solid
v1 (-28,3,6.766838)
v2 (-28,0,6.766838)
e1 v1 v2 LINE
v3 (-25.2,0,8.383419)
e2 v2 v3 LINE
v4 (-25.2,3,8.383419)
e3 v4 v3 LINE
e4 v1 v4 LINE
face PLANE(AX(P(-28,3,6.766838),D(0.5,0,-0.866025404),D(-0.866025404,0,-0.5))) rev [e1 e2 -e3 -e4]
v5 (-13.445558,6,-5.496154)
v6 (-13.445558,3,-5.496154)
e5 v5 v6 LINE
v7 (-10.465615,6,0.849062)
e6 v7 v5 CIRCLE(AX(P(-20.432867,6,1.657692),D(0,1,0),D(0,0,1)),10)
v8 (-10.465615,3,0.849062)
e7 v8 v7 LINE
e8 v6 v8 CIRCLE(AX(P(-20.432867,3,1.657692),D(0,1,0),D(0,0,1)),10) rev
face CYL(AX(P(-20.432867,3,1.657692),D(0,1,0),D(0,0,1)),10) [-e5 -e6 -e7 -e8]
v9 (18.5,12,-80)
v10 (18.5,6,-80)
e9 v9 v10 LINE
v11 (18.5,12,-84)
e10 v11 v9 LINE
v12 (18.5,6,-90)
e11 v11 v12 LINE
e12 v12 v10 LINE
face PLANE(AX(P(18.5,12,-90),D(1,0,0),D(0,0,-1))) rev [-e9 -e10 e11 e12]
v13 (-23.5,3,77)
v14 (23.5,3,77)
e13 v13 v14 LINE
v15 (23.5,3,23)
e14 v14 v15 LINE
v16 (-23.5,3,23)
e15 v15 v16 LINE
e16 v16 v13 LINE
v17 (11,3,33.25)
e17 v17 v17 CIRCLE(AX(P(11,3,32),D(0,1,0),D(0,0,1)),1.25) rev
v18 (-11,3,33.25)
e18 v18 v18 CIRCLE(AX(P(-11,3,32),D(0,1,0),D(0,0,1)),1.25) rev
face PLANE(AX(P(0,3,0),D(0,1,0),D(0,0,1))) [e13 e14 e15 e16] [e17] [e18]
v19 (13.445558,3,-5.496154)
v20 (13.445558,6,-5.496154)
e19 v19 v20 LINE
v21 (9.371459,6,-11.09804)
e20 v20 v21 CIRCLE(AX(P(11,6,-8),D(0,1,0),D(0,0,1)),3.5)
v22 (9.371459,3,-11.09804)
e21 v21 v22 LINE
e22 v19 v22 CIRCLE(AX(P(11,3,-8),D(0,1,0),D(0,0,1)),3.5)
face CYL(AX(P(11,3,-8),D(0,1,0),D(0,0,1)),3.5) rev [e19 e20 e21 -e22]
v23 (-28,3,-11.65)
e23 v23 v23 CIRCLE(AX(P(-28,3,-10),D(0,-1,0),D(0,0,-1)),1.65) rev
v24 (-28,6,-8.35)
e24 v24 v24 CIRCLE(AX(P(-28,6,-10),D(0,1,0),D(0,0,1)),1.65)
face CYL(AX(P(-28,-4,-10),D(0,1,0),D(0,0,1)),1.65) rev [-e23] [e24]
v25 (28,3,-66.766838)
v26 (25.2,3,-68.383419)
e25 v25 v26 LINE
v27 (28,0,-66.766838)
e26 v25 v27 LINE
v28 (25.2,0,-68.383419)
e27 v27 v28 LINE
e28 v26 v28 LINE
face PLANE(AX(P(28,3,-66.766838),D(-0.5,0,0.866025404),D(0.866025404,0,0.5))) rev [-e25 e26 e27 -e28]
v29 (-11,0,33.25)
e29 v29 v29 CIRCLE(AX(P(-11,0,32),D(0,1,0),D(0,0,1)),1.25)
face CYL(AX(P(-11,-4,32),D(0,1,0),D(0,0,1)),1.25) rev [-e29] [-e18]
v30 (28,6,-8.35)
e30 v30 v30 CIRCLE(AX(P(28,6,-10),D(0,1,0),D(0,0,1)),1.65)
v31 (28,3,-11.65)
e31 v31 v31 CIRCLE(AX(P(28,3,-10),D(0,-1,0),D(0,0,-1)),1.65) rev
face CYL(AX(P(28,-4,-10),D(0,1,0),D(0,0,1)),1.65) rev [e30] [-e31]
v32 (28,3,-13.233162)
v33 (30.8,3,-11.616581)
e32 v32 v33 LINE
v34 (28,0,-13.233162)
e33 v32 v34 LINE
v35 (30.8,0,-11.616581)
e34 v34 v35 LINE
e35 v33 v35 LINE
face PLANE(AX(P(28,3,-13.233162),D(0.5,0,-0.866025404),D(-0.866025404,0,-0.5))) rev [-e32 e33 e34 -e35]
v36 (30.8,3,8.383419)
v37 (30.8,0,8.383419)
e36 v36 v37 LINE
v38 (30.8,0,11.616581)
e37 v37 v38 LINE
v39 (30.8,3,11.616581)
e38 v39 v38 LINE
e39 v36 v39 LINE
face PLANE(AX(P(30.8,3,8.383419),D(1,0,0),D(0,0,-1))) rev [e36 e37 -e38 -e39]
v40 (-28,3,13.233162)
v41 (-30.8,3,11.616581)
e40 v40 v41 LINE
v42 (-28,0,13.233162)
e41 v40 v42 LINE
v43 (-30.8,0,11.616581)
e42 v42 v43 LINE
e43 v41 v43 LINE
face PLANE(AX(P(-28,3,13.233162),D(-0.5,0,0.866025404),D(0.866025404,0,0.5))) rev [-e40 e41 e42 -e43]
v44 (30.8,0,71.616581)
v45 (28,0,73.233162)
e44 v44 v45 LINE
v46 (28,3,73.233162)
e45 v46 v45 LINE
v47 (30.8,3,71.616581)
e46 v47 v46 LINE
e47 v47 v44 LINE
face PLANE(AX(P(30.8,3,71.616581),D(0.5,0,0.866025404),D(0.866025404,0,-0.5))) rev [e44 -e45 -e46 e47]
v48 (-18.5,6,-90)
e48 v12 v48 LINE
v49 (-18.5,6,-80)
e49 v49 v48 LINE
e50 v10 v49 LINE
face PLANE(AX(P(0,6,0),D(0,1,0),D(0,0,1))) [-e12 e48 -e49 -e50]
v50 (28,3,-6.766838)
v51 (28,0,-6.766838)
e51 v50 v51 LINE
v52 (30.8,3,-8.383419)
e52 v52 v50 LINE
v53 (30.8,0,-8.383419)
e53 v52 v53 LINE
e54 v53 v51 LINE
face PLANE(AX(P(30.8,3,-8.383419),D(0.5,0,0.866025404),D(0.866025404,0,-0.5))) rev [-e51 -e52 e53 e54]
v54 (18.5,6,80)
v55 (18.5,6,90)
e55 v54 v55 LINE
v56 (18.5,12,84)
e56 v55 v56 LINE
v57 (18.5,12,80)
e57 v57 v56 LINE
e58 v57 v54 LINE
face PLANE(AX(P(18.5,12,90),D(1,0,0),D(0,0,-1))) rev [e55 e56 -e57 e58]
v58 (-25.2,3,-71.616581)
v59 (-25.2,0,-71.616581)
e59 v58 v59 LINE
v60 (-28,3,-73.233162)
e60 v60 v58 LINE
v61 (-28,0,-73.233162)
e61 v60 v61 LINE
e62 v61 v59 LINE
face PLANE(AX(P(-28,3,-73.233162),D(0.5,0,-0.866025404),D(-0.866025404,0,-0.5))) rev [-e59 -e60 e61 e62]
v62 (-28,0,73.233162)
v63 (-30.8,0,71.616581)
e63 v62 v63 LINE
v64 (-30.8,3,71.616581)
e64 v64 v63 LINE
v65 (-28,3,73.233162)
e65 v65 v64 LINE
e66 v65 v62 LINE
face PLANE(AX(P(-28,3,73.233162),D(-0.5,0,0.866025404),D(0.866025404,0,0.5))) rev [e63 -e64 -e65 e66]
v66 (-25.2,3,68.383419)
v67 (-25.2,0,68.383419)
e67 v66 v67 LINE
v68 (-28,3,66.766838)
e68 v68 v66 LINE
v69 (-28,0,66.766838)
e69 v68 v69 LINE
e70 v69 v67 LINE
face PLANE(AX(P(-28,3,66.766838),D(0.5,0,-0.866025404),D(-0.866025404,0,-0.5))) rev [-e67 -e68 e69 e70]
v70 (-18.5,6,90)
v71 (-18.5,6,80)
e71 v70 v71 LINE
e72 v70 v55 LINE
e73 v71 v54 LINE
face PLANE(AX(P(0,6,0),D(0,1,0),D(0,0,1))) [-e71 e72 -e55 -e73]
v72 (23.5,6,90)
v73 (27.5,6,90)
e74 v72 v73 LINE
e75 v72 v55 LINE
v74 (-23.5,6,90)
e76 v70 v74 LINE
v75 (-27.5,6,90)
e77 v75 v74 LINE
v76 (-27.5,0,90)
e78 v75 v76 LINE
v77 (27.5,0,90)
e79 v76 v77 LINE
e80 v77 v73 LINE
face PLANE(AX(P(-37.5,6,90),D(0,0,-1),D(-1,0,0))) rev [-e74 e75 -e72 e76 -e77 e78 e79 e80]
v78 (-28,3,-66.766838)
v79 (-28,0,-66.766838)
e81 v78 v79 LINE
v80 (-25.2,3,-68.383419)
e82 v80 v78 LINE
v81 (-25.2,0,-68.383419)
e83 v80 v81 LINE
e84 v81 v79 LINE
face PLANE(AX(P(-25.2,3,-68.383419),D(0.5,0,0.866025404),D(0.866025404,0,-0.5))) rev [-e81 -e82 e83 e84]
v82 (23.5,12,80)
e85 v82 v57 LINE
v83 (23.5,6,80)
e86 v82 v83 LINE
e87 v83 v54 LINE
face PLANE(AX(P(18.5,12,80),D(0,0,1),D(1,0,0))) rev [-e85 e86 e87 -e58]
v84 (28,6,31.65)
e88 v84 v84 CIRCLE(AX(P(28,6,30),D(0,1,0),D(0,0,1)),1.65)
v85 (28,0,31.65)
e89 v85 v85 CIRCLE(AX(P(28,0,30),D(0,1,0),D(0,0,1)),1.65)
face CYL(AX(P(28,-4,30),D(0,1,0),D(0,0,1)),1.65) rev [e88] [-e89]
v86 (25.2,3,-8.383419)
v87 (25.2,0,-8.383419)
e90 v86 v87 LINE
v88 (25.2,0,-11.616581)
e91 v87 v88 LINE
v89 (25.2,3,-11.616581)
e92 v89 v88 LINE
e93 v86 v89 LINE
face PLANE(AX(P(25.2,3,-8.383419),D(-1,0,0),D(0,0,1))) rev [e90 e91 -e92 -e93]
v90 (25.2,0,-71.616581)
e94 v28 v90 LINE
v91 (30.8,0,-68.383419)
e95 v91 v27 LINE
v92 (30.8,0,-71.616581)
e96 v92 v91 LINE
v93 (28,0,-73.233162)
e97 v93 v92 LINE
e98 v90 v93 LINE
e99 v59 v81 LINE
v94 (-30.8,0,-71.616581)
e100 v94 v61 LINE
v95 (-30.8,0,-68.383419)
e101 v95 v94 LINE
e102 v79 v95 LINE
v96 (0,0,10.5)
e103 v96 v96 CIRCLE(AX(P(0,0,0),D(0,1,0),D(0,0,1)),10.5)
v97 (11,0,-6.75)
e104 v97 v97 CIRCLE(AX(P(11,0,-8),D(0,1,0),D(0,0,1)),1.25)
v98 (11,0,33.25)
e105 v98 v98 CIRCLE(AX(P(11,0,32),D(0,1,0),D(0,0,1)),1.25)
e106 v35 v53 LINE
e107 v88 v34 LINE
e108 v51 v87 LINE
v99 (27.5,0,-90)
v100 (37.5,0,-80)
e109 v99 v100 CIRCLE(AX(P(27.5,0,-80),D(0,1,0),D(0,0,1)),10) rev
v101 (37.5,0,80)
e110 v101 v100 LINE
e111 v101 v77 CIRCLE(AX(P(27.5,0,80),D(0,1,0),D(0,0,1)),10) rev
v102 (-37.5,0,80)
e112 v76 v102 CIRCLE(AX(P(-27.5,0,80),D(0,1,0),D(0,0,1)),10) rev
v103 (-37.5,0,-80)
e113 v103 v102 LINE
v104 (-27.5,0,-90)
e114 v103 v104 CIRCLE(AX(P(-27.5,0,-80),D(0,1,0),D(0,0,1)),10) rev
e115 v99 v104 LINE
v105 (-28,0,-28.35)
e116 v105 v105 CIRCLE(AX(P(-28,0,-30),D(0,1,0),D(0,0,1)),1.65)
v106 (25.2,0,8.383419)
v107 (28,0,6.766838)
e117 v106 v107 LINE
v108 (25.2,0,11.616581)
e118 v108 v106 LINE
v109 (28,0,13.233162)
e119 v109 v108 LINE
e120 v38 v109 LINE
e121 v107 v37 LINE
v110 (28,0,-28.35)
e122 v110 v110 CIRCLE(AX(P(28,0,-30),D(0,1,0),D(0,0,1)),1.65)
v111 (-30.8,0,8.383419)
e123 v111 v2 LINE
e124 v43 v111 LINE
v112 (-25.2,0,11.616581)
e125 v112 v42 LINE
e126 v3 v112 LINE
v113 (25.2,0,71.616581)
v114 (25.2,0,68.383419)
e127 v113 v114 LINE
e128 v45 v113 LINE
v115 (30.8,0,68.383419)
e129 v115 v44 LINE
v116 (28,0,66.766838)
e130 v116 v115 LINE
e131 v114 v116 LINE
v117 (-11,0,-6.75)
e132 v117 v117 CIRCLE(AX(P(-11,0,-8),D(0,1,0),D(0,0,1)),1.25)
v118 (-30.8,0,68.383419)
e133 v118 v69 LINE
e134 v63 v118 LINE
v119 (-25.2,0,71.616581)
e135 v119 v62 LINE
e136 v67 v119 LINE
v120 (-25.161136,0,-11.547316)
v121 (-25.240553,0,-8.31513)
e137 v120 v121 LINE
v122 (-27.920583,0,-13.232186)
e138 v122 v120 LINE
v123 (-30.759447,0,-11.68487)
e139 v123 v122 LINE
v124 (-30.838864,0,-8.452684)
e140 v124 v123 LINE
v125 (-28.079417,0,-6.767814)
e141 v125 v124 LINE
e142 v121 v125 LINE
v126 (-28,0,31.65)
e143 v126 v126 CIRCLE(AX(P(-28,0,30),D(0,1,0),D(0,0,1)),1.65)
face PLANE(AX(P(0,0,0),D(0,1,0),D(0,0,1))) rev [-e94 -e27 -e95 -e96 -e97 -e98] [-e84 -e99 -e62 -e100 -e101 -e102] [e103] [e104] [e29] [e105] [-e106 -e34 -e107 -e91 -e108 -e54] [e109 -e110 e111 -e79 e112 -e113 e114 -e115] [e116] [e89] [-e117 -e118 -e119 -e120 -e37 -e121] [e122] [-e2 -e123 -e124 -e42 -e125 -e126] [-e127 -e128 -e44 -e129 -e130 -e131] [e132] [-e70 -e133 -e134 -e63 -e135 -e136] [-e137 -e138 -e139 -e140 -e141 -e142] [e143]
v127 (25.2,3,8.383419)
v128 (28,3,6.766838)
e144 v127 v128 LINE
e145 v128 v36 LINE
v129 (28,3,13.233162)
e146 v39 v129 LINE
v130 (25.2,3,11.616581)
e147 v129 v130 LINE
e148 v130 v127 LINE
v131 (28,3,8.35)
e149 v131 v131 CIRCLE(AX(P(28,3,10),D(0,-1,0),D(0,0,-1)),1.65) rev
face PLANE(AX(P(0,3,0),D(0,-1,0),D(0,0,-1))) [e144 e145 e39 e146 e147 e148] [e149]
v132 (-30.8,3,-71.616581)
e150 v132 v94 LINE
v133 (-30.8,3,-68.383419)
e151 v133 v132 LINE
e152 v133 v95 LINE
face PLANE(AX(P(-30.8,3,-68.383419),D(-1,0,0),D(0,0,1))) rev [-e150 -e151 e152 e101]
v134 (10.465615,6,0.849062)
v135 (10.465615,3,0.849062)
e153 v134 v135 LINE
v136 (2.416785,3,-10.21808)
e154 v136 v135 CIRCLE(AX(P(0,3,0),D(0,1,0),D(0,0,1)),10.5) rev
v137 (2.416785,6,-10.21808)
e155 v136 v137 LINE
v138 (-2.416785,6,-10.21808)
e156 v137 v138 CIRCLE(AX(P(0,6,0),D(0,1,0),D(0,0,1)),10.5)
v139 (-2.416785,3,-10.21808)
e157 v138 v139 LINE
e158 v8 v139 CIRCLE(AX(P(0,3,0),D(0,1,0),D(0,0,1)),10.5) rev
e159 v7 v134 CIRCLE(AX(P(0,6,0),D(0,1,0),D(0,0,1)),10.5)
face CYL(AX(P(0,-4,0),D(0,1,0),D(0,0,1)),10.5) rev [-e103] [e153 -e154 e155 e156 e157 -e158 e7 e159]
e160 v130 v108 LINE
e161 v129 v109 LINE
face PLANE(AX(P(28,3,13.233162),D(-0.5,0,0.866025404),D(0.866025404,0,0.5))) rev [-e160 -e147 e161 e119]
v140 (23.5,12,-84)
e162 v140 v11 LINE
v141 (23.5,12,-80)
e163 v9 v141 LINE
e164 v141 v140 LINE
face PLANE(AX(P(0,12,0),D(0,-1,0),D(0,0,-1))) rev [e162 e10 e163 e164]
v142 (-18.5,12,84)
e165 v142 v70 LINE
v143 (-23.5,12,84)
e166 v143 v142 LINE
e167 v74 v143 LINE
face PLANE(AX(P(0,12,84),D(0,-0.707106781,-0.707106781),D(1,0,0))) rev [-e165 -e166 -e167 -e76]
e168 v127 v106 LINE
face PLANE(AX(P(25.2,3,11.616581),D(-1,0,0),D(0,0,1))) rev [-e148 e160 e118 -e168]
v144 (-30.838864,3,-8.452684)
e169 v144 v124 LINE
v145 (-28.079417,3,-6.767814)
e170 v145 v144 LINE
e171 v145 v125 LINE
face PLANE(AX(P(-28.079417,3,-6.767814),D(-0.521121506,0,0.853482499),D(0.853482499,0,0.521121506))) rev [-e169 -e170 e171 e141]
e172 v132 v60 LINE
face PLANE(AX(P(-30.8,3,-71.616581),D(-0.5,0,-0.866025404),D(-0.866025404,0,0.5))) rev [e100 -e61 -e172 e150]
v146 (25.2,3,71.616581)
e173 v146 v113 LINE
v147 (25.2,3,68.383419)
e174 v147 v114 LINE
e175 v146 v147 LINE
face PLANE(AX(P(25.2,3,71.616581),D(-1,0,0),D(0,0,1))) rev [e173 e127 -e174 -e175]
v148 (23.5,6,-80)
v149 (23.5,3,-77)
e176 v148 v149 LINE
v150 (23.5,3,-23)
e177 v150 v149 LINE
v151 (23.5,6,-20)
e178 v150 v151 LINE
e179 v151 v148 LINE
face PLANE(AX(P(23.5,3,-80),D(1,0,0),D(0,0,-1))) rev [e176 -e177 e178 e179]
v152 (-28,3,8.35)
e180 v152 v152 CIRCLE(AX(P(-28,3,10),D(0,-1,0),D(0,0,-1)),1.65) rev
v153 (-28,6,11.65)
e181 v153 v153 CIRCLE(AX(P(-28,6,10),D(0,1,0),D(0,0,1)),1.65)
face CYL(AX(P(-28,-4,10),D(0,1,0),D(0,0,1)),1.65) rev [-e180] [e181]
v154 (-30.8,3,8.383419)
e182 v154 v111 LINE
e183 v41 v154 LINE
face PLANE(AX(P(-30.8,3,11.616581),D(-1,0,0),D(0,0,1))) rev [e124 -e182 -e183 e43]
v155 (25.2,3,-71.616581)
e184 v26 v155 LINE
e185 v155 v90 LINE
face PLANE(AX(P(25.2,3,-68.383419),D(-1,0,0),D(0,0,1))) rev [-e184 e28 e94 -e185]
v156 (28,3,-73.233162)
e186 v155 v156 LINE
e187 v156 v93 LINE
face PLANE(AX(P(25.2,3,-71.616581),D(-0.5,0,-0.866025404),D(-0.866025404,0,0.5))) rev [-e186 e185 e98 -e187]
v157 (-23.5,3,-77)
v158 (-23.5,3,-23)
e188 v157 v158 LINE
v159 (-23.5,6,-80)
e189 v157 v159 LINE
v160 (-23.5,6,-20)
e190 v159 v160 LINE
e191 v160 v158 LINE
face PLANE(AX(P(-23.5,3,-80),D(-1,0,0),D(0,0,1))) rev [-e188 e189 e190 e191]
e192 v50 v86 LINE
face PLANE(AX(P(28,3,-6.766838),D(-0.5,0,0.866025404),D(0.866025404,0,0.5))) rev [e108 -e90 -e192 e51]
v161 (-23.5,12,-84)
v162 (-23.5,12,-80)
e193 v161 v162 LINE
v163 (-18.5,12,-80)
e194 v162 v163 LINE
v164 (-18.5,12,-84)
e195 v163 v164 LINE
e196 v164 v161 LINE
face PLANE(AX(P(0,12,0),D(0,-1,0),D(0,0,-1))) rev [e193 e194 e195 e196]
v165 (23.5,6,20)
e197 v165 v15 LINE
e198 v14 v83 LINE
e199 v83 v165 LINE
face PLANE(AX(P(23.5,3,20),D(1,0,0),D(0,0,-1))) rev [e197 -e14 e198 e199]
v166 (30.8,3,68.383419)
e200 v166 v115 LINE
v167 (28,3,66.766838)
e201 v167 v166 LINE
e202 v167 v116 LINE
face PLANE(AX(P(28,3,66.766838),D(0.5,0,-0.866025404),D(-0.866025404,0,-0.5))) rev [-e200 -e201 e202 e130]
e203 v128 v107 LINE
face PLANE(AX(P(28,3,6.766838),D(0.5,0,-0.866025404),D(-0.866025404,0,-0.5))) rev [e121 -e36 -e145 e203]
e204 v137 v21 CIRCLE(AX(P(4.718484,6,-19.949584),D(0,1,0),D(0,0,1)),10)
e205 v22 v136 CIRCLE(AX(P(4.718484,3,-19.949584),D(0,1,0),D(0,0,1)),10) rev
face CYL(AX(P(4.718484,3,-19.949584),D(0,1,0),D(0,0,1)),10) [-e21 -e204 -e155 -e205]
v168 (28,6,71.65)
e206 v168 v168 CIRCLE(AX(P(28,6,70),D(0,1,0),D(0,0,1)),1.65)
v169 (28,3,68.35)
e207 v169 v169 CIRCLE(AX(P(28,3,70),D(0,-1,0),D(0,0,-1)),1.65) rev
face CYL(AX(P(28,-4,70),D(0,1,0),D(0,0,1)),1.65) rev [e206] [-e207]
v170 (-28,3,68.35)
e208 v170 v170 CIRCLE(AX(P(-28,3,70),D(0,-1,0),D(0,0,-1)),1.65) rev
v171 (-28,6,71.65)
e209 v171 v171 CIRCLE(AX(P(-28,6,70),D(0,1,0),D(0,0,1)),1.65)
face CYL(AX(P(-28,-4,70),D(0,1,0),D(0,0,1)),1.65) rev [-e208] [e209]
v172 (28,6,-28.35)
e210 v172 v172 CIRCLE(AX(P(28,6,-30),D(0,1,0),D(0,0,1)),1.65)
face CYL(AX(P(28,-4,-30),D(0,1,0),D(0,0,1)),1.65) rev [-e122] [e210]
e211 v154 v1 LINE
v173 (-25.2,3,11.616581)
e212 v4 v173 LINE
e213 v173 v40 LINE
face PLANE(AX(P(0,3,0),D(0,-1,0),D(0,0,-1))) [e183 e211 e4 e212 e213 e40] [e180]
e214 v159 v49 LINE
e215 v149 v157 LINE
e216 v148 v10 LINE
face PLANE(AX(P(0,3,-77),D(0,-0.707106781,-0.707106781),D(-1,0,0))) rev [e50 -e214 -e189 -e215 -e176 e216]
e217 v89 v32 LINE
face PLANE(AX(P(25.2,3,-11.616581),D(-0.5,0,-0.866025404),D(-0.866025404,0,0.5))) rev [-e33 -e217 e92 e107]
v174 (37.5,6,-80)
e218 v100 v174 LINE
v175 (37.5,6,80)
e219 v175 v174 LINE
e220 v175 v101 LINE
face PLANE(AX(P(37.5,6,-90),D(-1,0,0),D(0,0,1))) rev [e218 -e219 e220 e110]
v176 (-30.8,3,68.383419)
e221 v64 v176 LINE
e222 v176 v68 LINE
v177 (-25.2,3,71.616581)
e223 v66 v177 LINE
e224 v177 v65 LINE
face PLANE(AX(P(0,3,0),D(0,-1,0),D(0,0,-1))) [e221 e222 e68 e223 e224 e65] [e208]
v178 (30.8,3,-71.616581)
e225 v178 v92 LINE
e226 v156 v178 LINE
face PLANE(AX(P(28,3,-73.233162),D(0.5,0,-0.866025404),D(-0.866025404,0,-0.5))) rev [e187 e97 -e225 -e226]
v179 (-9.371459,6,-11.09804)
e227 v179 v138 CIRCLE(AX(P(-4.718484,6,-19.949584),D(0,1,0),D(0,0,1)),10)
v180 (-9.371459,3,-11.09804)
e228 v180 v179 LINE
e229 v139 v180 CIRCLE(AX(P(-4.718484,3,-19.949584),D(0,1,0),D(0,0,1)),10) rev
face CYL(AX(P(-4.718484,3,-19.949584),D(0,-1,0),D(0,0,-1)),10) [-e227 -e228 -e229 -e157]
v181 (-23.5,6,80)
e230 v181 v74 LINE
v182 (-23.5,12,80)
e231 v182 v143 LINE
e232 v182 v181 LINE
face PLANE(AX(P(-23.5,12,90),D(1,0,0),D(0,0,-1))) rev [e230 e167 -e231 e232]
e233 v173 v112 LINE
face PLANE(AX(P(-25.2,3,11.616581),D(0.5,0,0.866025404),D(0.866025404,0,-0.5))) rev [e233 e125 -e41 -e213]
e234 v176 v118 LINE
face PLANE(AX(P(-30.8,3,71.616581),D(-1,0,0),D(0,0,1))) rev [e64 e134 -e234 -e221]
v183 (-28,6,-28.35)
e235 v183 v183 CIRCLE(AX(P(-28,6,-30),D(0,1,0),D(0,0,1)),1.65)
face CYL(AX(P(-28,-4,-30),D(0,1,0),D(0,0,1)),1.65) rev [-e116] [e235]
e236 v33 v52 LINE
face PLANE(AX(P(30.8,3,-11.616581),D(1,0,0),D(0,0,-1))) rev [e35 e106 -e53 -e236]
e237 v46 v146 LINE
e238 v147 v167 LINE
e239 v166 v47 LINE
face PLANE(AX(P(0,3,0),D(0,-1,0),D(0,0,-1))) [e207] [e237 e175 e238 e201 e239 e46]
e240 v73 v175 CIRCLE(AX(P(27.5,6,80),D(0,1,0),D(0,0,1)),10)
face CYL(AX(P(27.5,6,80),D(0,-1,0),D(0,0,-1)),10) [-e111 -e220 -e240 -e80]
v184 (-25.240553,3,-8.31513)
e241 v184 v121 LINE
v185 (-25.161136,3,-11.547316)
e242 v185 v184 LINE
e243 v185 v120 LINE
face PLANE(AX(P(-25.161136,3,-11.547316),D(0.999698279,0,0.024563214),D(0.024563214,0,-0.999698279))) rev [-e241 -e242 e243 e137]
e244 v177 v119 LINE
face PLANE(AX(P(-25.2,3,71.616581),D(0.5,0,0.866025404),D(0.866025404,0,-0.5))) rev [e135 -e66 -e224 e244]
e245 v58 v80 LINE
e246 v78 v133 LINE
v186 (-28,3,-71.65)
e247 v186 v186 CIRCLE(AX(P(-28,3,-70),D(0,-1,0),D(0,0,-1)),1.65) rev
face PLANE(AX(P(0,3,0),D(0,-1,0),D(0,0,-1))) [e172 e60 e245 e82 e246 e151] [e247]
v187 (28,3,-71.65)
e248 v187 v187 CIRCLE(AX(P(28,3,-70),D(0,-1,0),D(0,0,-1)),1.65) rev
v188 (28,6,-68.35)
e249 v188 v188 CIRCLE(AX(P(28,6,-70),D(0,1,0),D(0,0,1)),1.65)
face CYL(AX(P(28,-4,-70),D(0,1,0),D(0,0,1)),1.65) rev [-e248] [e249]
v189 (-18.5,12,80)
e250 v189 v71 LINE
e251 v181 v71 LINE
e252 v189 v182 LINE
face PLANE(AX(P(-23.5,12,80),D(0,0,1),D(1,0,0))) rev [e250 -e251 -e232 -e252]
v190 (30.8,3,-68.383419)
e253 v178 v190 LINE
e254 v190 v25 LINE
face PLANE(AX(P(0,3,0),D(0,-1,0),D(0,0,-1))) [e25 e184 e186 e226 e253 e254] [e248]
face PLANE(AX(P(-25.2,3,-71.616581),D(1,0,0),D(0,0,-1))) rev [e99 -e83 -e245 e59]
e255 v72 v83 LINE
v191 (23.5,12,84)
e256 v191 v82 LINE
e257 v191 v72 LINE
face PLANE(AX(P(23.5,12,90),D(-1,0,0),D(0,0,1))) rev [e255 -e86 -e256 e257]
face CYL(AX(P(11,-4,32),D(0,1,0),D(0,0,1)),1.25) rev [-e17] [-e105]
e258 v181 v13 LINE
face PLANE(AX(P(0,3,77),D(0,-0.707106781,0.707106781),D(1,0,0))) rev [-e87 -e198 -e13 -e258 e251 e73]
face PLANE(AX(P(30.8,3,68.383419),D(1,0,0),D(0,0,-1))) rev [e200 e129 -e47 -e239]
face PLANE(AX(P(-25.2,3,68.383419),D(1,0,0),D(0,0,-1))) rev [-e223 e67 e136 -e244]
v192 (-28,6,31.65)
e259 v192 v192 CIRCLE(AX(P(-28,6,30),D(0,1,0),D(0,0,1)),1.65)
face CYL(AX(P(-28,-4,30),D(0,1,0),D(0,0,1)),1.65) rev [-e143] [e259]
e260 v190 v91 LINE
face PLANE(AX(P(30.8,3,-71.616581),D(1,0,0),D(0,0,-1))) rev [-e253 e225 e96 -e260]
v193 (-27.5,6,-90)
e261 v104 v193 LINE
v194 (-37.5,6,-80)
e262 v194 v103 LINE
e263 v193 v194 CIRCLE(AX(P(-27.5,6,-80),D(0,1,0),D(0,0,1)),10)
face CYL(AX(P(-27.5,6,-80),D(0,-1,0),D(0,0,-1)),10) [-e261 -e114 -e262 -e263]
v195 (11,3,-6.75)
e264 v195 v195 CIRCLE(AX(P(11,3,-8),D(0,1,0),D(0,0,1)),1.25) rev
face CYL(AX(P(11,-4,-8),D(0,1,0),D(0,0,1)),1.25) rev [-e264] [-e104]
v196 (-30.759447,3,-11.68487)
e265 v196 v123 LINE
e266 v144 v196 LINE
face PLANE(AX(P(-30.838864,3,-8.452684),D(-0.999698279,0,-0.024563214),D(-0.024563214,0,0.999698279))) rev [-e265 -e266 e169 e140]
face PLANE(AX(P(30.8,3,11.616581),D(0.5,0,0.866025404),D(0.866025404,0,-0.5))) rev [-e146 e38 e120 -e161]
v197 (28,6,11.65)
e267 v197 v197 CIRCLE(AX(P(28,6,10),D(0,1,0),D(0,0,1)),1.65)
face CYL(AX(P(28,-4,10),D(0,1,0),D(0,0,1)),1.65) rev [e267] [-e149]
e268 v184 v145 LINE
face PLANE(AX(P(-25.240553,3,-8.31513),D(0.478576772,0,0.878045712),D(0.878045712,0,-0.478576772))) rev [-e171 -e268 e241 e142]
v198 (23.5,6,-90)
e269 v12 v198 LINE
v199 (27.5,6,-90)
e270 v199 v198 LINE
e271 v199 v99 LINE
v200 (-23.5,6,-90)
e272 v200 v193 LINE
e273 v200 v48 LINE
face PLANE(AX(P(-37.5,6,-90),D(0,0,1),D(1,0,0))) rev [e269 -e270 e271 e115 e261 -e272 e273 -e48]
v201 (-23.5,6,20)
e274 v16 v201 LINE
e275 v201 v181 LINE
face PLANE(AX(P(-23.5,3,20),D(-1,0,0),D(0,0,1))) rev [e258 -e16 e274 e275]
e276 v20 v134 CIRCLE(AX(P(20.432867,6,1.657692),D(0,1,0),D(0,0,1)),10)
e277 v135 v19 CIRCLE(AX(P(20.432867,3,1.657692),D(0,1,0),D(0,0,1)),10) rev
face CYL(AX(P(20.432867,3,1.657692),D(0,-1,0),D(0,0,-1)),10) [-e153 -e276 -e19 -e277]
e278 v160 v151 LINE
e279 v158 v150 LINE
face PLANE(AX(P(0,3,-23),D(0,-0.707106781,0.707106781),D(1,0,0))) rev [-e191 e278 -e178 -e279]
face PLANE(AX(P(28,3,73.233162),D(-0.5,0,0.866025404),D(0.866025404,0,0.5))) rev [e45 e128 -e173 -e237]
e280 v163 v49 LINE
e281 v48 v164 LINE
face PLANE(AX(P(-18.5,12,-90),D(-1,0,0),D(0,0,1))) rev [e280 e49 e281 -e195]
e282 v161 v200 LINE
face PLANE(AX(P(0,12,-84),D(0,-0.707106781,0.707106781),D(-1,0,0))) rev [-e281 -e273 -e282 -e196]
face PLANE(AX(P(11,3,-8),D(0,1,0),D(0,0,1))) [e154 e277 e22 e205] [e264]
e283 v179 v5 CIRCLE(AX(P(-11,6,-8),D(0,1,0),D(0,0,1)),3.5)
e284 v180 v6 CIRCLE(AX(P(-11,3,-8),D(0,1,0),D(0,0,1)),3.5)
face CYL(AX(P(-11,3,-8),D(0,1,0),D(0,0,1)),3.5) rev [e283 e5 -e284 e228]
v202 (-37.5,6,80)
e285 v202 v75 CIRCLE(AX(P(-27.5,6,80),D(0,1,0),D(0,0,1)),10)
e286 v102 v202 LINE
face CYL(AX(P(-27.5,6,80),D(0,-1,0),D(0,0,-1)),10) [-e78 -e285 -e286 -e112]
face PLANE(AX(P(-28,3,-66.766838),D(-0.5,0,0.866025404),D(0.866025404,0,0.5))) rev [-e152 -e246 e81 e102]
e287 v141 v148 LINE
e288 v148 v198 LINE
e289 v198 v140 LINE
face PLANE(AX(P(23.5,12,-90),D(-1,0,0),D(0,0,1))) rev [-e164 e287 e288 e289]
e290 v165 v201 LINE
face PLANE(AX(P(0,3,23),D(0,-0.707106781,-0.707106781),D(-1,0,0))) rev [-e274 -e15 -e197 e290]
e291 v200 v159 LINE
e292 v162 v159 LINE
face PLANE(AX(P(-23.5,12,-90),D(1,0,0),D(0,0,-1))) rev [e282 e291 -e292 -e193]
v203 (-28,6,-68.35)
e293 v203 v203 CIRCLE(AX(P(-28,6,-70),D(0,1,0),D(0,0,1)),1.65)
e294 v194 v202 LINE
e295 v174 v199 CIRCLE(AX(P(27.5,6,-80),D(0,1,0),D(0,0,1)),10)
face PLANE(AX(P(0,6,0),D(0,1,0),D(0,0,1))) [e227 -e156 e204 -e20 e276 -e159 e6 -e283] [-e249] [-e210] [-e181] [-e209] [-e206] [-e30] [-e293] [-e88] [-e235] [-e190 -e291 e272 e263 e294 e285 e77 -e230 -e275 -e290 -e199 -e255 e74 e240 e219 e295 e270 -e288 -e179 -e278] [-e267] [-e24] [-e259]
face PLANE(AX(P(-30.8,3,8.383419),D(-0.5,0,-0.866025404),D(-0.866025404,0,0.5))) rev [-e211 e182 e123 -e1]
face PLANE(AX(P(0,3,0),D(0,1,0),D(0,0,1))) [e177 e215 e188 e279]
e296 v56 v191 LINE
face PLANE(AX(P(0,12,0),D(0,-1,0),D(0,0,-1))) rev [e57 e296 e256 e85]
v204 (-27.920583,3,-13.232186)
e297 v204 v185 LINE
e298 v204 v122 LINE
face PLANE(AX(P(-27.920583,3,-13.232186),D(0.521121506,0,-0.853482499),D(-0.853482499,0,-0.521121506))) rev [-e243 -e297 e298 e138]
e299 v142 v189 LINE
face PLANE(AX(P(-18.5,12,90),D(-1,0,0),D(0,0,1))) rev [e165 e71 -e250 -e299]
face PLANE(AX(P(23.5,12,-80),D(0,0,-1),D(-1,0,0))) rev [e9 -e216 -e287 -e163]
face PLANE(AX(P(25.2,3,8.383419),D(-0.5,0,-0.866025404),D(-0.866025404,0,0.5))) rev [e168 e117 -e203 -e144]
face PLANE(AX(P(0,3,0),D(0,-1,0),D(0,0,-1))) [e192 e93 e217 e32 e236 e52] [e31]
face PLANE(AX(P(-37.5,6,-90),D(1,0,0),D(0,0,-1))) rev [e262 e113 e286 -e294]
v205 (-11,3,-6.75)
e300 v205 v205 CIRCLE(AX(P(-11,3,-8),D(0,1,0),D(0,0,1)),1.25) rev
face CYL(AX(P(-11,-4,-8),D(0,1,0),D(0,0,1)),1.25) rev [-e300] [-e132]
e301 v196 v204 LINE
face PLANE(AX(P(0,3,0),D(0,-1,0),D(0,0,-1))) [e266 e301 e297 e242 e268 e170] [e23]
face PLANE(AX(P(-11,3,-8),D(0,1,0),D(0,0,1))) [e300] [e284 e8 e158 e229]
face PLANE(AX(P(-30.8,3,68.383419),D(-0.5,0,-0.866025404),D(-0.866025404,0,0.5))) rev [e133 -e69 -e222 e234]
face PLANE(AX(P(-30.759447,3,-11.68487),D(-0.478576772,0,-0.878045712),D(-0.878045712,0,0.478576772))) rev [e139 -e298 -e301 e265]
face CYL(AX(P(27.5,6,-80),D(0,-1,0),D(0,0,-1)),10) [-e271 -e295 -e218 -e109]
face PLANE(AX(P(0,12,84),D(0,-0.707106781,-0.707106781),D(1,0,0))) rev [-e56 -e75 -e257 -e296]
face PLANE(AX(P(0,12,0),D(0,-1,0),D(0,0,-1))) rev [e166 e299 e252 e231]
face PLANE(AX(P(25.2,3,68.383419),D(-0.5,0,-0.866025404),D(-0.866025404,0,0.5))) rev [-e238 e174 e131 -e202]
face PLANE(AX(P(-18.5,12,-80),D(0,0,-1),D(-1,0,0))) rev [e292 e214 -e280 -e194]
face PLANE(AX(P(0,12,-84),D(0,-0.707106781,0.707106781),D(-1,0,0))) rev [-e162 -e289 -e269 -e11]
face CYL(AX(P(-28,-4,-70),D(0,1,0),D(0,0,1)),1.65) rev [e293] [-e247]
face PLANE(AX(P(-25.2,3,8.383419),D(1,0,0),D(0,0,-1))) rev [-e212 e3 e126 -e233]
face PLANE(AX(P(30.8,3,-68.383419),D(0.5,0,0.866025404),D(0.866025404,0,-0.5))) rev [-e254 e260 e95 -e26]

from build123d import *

# Parameters (mm, degrees)
SKETCH1_W           = 75
SKETCH1_H           = 180
BOSS_EXTRUDE1_DEPTH = 6
FILLET1_R           = 10
SKETCH2_R           = 10.5
SKETCH2_R_2         = 1.25
SKETCH2_R_3         = 1.65
CUT_EXTRUDE1_DEPTH  = 10
CUT_EXTRUDE2_DEPTH  = 3
SKETCH5_R           = 3.5
SKETCH5_W           = 47
SKETCH5_H           = 60
CUT_EXTRUDE3_DEPTH  = 3
FILLET2_R           = 10
CHAMFER1_SIZE       = 3
SKETCH6_W           = 5
SKETCH6_H           = 10
BOSS_EXTRUDE2_DEPTH = 6
CHAMFER2_SIZE       = 6


with BuildPart() as part:
    # Sketch1 → Boss-Extrude1 (new body)
    with BuildSketch(Plane(origin=(0, 0, 0), x_dir=(1, 0, 0), z_dir=(0, 1, 0))):
        Rectangle(SKETCH1_W, SKETCH1_H)
    extrude(amount=BOSS_EXTRUDE1_DEPTH)

    # Fillet1
    fillet1_edges = [part.edges().sort_by_distance(p)[0] for p in [
        (-37.5, 3, -90),
        (37.5, 3, -90),
        (37.5, 3, 90),
        (-37.5, 3, 90),
    ]]
    fillet(fillet1_edges, radius=FILLET1_R)

    # Sketch2 → Cut-Extrude1 (cut)
    with BuildSketch(Plane(origin=(0, 6, 0), x_dir=(1, 0, 0), z_dir=(0, 1, 0))):
        with Locations(Location((0, 0, 0), (0, 0, 270))):
            Circle(SKETCH2_R)
        with Locations(Location((-11, 8, 0), (0, 0, 270))):
            Circle(SKETCH2_R_2)
        with Locations(Location((11, 8, 0), (0, 0, 270))):
            Circle(SKETCH2_R_2)
        with Locations(Location((-11, -32, 0), (0, 0, 270))):
            Circle(SKETCH2_R_2)
        with Locations(Location((11, -32, 0), (0, 0, 270))):
            Circle(SKETCH2_R_2)
        with Locations(Location((-28, -70, 0), (0, 0, 270))):
            Circle(SKETCH2_R_3)
        with Locations(Location((28, -70, 0), (0, 0, 270))):
            Circle(SKETCH2_R_3)
        with Locations(Location((-28, 70, 0), (0, 0, 270))):
            Circle(SKETCH2_R_3)
        with Locations(Location((28, 70, 0), (0, 0, 270))):
            Circle(SKETCH2_R_3)
        with Locations(Location((-28, 10, 0), (0, 0, 270))):
            Circle(SKETCH2_R_3)
        with Locations(Location((-28, -10, 0), (0, 0, 270))):
            Circle(SKETCH2_R_3)
        with Locations(Location((28, 10, 0), (0, 0, 270))):
            Circle(SKETCH2_R_3)
        with Locations(Location((28, -10, 0), (0, 0, 270))):
            Circle(SKETCH2_R_3)
        with Locations(Location((-28, 30, 0), (0, 0, 270))):
            Circle(SKETCH2_R_3)
        with Locations(Location((28, 30, 0), (0, 0, 270))):
            Circle(SKETCH2_R_3)
        with Locations(Location((28, -30, 0), (0, 0, 270))):
            Circle(SKETCH2_R_3)
        with Locations(Location((-28, -30, 0), (0, 0, 270))):
            Circle(SKETCH2_R_3)
    extrude(amount=-CUT_EXTRUDE1_DEPTH, mode=Mode.SUBTRACT)

    # Sketch4 → Cut-Extrude2 (cut)
    with BuildSketch(Plane.XZ):
        Polygon((-28, 6.766838493), (-25.2, 8.383419246), (-25.2, 11.616580754), (-28, 13.233161507), (-30.8, 11.616580754), (-30.8, 8.383419246), align=None)
        Polygon((-27.920583163, -13.232185994), (-25.161136401, -11.547315999), (-25.240553238, -8.315130005), (-28.079416837, -6.767814006), (-30.838863599, -8.452684001), (-30.759446762, -11.684869995), align=None)
        Polygon((28, -13.233161507), (30.8, -11.616580754), (30.8, -8.383419246), (28, -6.766838493), (25.2, -8.383419246), (25.2, -11.616580754), align=None)
        Polygon((28, 6.766838493), (30.8, 8.383419246), (30.8, 11.616580754), (28, 13.233161507), (25.2, 11.616580754), (25.2, 8.383419246), align=None)
        Polygon((28, 66.766838493), (30.8, 68.383419246), (30.8, 71.616580754), (28, 73.233161507), (25.2, 71.616580754), (25.2, 68.383419246), align=None)
        Polygon((-28, 66.766838493), (-25.2, 68.383419246), (-25.2, 71.616580754), (-28, 73.233161507), (-30.8, 71.616580754), (-30.8, 68.383419246), align=None)
        Polygon((28, -73.233161507), (30.8, -71.616580754), (30.8, -68.383419246), (28, -66.766838493), (25.2, -68.383419246), (25.2, -71.616580754), align=None)
        Polygon((-28, -73.233161507), (-25.2, -71.616580754), (-25.2, -68.383419246), (-28, -66.766838493), (-30.8, -68.383419246), (-30.8, -71.616580754), align=None)
    extrude(amount=-CUT_EXTRUDE2_DEPTH, mode=Mode.SUBTRACT)

    # Sketch5 → Cut-Extrude3 (cut)
    with BuildSketch(Plane(origin=(0, 6, 0), x_dir=(1, 0, 0), z_dir=(0, 1, 0))):
        with Locations((-11, 8)):
            Circle(SKETCH5_R)
        with Locations((11, 8)):
            Circle(SKETCH5_R)
        with Locations((0, 50)):
            Rectangle(SKETCH5_W, SKETCH5_H)
        with Locations((0, -50)):
            Rectangle(SKETCH5_W, SKETCH5_H)
    extrude(amount=-CUT_EXTRUDE3_DEPTH, mode=Mode.SUBTRACT)

    # Fillet2
    fillet2_edges = [part.edges().sort_by_distance(p)[0] for p in [
        (-7.57722899, 4.5, -7.268810139),
        (-9.249798037, 4.5, -4.969027699),
        (9.249798037, 4.5, -4.969027699),
        (7.57722899, 4.5, -7.268810139),
    ]]
    fillet(fillet2_edges, radius=FILLET2_R)

    # Chamfer1
    chamfer1_edges = [part.edges().sort_by_distance(p)[0] for p in [
        (0, 3, 80),
        (0, 3, -80),
        (0, 3, -20),
        (0, 3, 20),
    ]]
    chamfer(chamfer1_edges, length=CHAMFER1_SIZE - 0.0001)  # a hair under: the kernel refuses the full size

    # Sketch6 → Boss-Extrude2 (add)
    with BuildSketch(Plane(origin=(0, 6, 0), x_dir=(1, 0, 0), z_dir=(0, 1, 0))):
        with Locations((-21, 85)):
            Rectangle(SKETCH6_W, SKETCH6_H)
        with Locations((21, -85)):
            Rectangle(SKETCH6_W, SKETCH6_H)
        with Locations((21, 85)):
            Rectangle(SKETCH6_W, SKETCH6_H)
        with Locations((-21, -85)):
            Rectangle(SKETCH6_W, SKETCH6_H)
    extrude(amount=BOSS_EXTRUDE2_DEPTH)

    # Chamfer2
    chamfer2_edges = [part.edges().sort_by_distance(p)[0] for p in [
        (21, 12, 90),
        (-21, 12, -90),
        (21, 12, -90),
        (-21, 12, 90),
    ]]
    chamfer(chamfer2_edges, length=CHAMFER2_SIZE)


solid = part.part
